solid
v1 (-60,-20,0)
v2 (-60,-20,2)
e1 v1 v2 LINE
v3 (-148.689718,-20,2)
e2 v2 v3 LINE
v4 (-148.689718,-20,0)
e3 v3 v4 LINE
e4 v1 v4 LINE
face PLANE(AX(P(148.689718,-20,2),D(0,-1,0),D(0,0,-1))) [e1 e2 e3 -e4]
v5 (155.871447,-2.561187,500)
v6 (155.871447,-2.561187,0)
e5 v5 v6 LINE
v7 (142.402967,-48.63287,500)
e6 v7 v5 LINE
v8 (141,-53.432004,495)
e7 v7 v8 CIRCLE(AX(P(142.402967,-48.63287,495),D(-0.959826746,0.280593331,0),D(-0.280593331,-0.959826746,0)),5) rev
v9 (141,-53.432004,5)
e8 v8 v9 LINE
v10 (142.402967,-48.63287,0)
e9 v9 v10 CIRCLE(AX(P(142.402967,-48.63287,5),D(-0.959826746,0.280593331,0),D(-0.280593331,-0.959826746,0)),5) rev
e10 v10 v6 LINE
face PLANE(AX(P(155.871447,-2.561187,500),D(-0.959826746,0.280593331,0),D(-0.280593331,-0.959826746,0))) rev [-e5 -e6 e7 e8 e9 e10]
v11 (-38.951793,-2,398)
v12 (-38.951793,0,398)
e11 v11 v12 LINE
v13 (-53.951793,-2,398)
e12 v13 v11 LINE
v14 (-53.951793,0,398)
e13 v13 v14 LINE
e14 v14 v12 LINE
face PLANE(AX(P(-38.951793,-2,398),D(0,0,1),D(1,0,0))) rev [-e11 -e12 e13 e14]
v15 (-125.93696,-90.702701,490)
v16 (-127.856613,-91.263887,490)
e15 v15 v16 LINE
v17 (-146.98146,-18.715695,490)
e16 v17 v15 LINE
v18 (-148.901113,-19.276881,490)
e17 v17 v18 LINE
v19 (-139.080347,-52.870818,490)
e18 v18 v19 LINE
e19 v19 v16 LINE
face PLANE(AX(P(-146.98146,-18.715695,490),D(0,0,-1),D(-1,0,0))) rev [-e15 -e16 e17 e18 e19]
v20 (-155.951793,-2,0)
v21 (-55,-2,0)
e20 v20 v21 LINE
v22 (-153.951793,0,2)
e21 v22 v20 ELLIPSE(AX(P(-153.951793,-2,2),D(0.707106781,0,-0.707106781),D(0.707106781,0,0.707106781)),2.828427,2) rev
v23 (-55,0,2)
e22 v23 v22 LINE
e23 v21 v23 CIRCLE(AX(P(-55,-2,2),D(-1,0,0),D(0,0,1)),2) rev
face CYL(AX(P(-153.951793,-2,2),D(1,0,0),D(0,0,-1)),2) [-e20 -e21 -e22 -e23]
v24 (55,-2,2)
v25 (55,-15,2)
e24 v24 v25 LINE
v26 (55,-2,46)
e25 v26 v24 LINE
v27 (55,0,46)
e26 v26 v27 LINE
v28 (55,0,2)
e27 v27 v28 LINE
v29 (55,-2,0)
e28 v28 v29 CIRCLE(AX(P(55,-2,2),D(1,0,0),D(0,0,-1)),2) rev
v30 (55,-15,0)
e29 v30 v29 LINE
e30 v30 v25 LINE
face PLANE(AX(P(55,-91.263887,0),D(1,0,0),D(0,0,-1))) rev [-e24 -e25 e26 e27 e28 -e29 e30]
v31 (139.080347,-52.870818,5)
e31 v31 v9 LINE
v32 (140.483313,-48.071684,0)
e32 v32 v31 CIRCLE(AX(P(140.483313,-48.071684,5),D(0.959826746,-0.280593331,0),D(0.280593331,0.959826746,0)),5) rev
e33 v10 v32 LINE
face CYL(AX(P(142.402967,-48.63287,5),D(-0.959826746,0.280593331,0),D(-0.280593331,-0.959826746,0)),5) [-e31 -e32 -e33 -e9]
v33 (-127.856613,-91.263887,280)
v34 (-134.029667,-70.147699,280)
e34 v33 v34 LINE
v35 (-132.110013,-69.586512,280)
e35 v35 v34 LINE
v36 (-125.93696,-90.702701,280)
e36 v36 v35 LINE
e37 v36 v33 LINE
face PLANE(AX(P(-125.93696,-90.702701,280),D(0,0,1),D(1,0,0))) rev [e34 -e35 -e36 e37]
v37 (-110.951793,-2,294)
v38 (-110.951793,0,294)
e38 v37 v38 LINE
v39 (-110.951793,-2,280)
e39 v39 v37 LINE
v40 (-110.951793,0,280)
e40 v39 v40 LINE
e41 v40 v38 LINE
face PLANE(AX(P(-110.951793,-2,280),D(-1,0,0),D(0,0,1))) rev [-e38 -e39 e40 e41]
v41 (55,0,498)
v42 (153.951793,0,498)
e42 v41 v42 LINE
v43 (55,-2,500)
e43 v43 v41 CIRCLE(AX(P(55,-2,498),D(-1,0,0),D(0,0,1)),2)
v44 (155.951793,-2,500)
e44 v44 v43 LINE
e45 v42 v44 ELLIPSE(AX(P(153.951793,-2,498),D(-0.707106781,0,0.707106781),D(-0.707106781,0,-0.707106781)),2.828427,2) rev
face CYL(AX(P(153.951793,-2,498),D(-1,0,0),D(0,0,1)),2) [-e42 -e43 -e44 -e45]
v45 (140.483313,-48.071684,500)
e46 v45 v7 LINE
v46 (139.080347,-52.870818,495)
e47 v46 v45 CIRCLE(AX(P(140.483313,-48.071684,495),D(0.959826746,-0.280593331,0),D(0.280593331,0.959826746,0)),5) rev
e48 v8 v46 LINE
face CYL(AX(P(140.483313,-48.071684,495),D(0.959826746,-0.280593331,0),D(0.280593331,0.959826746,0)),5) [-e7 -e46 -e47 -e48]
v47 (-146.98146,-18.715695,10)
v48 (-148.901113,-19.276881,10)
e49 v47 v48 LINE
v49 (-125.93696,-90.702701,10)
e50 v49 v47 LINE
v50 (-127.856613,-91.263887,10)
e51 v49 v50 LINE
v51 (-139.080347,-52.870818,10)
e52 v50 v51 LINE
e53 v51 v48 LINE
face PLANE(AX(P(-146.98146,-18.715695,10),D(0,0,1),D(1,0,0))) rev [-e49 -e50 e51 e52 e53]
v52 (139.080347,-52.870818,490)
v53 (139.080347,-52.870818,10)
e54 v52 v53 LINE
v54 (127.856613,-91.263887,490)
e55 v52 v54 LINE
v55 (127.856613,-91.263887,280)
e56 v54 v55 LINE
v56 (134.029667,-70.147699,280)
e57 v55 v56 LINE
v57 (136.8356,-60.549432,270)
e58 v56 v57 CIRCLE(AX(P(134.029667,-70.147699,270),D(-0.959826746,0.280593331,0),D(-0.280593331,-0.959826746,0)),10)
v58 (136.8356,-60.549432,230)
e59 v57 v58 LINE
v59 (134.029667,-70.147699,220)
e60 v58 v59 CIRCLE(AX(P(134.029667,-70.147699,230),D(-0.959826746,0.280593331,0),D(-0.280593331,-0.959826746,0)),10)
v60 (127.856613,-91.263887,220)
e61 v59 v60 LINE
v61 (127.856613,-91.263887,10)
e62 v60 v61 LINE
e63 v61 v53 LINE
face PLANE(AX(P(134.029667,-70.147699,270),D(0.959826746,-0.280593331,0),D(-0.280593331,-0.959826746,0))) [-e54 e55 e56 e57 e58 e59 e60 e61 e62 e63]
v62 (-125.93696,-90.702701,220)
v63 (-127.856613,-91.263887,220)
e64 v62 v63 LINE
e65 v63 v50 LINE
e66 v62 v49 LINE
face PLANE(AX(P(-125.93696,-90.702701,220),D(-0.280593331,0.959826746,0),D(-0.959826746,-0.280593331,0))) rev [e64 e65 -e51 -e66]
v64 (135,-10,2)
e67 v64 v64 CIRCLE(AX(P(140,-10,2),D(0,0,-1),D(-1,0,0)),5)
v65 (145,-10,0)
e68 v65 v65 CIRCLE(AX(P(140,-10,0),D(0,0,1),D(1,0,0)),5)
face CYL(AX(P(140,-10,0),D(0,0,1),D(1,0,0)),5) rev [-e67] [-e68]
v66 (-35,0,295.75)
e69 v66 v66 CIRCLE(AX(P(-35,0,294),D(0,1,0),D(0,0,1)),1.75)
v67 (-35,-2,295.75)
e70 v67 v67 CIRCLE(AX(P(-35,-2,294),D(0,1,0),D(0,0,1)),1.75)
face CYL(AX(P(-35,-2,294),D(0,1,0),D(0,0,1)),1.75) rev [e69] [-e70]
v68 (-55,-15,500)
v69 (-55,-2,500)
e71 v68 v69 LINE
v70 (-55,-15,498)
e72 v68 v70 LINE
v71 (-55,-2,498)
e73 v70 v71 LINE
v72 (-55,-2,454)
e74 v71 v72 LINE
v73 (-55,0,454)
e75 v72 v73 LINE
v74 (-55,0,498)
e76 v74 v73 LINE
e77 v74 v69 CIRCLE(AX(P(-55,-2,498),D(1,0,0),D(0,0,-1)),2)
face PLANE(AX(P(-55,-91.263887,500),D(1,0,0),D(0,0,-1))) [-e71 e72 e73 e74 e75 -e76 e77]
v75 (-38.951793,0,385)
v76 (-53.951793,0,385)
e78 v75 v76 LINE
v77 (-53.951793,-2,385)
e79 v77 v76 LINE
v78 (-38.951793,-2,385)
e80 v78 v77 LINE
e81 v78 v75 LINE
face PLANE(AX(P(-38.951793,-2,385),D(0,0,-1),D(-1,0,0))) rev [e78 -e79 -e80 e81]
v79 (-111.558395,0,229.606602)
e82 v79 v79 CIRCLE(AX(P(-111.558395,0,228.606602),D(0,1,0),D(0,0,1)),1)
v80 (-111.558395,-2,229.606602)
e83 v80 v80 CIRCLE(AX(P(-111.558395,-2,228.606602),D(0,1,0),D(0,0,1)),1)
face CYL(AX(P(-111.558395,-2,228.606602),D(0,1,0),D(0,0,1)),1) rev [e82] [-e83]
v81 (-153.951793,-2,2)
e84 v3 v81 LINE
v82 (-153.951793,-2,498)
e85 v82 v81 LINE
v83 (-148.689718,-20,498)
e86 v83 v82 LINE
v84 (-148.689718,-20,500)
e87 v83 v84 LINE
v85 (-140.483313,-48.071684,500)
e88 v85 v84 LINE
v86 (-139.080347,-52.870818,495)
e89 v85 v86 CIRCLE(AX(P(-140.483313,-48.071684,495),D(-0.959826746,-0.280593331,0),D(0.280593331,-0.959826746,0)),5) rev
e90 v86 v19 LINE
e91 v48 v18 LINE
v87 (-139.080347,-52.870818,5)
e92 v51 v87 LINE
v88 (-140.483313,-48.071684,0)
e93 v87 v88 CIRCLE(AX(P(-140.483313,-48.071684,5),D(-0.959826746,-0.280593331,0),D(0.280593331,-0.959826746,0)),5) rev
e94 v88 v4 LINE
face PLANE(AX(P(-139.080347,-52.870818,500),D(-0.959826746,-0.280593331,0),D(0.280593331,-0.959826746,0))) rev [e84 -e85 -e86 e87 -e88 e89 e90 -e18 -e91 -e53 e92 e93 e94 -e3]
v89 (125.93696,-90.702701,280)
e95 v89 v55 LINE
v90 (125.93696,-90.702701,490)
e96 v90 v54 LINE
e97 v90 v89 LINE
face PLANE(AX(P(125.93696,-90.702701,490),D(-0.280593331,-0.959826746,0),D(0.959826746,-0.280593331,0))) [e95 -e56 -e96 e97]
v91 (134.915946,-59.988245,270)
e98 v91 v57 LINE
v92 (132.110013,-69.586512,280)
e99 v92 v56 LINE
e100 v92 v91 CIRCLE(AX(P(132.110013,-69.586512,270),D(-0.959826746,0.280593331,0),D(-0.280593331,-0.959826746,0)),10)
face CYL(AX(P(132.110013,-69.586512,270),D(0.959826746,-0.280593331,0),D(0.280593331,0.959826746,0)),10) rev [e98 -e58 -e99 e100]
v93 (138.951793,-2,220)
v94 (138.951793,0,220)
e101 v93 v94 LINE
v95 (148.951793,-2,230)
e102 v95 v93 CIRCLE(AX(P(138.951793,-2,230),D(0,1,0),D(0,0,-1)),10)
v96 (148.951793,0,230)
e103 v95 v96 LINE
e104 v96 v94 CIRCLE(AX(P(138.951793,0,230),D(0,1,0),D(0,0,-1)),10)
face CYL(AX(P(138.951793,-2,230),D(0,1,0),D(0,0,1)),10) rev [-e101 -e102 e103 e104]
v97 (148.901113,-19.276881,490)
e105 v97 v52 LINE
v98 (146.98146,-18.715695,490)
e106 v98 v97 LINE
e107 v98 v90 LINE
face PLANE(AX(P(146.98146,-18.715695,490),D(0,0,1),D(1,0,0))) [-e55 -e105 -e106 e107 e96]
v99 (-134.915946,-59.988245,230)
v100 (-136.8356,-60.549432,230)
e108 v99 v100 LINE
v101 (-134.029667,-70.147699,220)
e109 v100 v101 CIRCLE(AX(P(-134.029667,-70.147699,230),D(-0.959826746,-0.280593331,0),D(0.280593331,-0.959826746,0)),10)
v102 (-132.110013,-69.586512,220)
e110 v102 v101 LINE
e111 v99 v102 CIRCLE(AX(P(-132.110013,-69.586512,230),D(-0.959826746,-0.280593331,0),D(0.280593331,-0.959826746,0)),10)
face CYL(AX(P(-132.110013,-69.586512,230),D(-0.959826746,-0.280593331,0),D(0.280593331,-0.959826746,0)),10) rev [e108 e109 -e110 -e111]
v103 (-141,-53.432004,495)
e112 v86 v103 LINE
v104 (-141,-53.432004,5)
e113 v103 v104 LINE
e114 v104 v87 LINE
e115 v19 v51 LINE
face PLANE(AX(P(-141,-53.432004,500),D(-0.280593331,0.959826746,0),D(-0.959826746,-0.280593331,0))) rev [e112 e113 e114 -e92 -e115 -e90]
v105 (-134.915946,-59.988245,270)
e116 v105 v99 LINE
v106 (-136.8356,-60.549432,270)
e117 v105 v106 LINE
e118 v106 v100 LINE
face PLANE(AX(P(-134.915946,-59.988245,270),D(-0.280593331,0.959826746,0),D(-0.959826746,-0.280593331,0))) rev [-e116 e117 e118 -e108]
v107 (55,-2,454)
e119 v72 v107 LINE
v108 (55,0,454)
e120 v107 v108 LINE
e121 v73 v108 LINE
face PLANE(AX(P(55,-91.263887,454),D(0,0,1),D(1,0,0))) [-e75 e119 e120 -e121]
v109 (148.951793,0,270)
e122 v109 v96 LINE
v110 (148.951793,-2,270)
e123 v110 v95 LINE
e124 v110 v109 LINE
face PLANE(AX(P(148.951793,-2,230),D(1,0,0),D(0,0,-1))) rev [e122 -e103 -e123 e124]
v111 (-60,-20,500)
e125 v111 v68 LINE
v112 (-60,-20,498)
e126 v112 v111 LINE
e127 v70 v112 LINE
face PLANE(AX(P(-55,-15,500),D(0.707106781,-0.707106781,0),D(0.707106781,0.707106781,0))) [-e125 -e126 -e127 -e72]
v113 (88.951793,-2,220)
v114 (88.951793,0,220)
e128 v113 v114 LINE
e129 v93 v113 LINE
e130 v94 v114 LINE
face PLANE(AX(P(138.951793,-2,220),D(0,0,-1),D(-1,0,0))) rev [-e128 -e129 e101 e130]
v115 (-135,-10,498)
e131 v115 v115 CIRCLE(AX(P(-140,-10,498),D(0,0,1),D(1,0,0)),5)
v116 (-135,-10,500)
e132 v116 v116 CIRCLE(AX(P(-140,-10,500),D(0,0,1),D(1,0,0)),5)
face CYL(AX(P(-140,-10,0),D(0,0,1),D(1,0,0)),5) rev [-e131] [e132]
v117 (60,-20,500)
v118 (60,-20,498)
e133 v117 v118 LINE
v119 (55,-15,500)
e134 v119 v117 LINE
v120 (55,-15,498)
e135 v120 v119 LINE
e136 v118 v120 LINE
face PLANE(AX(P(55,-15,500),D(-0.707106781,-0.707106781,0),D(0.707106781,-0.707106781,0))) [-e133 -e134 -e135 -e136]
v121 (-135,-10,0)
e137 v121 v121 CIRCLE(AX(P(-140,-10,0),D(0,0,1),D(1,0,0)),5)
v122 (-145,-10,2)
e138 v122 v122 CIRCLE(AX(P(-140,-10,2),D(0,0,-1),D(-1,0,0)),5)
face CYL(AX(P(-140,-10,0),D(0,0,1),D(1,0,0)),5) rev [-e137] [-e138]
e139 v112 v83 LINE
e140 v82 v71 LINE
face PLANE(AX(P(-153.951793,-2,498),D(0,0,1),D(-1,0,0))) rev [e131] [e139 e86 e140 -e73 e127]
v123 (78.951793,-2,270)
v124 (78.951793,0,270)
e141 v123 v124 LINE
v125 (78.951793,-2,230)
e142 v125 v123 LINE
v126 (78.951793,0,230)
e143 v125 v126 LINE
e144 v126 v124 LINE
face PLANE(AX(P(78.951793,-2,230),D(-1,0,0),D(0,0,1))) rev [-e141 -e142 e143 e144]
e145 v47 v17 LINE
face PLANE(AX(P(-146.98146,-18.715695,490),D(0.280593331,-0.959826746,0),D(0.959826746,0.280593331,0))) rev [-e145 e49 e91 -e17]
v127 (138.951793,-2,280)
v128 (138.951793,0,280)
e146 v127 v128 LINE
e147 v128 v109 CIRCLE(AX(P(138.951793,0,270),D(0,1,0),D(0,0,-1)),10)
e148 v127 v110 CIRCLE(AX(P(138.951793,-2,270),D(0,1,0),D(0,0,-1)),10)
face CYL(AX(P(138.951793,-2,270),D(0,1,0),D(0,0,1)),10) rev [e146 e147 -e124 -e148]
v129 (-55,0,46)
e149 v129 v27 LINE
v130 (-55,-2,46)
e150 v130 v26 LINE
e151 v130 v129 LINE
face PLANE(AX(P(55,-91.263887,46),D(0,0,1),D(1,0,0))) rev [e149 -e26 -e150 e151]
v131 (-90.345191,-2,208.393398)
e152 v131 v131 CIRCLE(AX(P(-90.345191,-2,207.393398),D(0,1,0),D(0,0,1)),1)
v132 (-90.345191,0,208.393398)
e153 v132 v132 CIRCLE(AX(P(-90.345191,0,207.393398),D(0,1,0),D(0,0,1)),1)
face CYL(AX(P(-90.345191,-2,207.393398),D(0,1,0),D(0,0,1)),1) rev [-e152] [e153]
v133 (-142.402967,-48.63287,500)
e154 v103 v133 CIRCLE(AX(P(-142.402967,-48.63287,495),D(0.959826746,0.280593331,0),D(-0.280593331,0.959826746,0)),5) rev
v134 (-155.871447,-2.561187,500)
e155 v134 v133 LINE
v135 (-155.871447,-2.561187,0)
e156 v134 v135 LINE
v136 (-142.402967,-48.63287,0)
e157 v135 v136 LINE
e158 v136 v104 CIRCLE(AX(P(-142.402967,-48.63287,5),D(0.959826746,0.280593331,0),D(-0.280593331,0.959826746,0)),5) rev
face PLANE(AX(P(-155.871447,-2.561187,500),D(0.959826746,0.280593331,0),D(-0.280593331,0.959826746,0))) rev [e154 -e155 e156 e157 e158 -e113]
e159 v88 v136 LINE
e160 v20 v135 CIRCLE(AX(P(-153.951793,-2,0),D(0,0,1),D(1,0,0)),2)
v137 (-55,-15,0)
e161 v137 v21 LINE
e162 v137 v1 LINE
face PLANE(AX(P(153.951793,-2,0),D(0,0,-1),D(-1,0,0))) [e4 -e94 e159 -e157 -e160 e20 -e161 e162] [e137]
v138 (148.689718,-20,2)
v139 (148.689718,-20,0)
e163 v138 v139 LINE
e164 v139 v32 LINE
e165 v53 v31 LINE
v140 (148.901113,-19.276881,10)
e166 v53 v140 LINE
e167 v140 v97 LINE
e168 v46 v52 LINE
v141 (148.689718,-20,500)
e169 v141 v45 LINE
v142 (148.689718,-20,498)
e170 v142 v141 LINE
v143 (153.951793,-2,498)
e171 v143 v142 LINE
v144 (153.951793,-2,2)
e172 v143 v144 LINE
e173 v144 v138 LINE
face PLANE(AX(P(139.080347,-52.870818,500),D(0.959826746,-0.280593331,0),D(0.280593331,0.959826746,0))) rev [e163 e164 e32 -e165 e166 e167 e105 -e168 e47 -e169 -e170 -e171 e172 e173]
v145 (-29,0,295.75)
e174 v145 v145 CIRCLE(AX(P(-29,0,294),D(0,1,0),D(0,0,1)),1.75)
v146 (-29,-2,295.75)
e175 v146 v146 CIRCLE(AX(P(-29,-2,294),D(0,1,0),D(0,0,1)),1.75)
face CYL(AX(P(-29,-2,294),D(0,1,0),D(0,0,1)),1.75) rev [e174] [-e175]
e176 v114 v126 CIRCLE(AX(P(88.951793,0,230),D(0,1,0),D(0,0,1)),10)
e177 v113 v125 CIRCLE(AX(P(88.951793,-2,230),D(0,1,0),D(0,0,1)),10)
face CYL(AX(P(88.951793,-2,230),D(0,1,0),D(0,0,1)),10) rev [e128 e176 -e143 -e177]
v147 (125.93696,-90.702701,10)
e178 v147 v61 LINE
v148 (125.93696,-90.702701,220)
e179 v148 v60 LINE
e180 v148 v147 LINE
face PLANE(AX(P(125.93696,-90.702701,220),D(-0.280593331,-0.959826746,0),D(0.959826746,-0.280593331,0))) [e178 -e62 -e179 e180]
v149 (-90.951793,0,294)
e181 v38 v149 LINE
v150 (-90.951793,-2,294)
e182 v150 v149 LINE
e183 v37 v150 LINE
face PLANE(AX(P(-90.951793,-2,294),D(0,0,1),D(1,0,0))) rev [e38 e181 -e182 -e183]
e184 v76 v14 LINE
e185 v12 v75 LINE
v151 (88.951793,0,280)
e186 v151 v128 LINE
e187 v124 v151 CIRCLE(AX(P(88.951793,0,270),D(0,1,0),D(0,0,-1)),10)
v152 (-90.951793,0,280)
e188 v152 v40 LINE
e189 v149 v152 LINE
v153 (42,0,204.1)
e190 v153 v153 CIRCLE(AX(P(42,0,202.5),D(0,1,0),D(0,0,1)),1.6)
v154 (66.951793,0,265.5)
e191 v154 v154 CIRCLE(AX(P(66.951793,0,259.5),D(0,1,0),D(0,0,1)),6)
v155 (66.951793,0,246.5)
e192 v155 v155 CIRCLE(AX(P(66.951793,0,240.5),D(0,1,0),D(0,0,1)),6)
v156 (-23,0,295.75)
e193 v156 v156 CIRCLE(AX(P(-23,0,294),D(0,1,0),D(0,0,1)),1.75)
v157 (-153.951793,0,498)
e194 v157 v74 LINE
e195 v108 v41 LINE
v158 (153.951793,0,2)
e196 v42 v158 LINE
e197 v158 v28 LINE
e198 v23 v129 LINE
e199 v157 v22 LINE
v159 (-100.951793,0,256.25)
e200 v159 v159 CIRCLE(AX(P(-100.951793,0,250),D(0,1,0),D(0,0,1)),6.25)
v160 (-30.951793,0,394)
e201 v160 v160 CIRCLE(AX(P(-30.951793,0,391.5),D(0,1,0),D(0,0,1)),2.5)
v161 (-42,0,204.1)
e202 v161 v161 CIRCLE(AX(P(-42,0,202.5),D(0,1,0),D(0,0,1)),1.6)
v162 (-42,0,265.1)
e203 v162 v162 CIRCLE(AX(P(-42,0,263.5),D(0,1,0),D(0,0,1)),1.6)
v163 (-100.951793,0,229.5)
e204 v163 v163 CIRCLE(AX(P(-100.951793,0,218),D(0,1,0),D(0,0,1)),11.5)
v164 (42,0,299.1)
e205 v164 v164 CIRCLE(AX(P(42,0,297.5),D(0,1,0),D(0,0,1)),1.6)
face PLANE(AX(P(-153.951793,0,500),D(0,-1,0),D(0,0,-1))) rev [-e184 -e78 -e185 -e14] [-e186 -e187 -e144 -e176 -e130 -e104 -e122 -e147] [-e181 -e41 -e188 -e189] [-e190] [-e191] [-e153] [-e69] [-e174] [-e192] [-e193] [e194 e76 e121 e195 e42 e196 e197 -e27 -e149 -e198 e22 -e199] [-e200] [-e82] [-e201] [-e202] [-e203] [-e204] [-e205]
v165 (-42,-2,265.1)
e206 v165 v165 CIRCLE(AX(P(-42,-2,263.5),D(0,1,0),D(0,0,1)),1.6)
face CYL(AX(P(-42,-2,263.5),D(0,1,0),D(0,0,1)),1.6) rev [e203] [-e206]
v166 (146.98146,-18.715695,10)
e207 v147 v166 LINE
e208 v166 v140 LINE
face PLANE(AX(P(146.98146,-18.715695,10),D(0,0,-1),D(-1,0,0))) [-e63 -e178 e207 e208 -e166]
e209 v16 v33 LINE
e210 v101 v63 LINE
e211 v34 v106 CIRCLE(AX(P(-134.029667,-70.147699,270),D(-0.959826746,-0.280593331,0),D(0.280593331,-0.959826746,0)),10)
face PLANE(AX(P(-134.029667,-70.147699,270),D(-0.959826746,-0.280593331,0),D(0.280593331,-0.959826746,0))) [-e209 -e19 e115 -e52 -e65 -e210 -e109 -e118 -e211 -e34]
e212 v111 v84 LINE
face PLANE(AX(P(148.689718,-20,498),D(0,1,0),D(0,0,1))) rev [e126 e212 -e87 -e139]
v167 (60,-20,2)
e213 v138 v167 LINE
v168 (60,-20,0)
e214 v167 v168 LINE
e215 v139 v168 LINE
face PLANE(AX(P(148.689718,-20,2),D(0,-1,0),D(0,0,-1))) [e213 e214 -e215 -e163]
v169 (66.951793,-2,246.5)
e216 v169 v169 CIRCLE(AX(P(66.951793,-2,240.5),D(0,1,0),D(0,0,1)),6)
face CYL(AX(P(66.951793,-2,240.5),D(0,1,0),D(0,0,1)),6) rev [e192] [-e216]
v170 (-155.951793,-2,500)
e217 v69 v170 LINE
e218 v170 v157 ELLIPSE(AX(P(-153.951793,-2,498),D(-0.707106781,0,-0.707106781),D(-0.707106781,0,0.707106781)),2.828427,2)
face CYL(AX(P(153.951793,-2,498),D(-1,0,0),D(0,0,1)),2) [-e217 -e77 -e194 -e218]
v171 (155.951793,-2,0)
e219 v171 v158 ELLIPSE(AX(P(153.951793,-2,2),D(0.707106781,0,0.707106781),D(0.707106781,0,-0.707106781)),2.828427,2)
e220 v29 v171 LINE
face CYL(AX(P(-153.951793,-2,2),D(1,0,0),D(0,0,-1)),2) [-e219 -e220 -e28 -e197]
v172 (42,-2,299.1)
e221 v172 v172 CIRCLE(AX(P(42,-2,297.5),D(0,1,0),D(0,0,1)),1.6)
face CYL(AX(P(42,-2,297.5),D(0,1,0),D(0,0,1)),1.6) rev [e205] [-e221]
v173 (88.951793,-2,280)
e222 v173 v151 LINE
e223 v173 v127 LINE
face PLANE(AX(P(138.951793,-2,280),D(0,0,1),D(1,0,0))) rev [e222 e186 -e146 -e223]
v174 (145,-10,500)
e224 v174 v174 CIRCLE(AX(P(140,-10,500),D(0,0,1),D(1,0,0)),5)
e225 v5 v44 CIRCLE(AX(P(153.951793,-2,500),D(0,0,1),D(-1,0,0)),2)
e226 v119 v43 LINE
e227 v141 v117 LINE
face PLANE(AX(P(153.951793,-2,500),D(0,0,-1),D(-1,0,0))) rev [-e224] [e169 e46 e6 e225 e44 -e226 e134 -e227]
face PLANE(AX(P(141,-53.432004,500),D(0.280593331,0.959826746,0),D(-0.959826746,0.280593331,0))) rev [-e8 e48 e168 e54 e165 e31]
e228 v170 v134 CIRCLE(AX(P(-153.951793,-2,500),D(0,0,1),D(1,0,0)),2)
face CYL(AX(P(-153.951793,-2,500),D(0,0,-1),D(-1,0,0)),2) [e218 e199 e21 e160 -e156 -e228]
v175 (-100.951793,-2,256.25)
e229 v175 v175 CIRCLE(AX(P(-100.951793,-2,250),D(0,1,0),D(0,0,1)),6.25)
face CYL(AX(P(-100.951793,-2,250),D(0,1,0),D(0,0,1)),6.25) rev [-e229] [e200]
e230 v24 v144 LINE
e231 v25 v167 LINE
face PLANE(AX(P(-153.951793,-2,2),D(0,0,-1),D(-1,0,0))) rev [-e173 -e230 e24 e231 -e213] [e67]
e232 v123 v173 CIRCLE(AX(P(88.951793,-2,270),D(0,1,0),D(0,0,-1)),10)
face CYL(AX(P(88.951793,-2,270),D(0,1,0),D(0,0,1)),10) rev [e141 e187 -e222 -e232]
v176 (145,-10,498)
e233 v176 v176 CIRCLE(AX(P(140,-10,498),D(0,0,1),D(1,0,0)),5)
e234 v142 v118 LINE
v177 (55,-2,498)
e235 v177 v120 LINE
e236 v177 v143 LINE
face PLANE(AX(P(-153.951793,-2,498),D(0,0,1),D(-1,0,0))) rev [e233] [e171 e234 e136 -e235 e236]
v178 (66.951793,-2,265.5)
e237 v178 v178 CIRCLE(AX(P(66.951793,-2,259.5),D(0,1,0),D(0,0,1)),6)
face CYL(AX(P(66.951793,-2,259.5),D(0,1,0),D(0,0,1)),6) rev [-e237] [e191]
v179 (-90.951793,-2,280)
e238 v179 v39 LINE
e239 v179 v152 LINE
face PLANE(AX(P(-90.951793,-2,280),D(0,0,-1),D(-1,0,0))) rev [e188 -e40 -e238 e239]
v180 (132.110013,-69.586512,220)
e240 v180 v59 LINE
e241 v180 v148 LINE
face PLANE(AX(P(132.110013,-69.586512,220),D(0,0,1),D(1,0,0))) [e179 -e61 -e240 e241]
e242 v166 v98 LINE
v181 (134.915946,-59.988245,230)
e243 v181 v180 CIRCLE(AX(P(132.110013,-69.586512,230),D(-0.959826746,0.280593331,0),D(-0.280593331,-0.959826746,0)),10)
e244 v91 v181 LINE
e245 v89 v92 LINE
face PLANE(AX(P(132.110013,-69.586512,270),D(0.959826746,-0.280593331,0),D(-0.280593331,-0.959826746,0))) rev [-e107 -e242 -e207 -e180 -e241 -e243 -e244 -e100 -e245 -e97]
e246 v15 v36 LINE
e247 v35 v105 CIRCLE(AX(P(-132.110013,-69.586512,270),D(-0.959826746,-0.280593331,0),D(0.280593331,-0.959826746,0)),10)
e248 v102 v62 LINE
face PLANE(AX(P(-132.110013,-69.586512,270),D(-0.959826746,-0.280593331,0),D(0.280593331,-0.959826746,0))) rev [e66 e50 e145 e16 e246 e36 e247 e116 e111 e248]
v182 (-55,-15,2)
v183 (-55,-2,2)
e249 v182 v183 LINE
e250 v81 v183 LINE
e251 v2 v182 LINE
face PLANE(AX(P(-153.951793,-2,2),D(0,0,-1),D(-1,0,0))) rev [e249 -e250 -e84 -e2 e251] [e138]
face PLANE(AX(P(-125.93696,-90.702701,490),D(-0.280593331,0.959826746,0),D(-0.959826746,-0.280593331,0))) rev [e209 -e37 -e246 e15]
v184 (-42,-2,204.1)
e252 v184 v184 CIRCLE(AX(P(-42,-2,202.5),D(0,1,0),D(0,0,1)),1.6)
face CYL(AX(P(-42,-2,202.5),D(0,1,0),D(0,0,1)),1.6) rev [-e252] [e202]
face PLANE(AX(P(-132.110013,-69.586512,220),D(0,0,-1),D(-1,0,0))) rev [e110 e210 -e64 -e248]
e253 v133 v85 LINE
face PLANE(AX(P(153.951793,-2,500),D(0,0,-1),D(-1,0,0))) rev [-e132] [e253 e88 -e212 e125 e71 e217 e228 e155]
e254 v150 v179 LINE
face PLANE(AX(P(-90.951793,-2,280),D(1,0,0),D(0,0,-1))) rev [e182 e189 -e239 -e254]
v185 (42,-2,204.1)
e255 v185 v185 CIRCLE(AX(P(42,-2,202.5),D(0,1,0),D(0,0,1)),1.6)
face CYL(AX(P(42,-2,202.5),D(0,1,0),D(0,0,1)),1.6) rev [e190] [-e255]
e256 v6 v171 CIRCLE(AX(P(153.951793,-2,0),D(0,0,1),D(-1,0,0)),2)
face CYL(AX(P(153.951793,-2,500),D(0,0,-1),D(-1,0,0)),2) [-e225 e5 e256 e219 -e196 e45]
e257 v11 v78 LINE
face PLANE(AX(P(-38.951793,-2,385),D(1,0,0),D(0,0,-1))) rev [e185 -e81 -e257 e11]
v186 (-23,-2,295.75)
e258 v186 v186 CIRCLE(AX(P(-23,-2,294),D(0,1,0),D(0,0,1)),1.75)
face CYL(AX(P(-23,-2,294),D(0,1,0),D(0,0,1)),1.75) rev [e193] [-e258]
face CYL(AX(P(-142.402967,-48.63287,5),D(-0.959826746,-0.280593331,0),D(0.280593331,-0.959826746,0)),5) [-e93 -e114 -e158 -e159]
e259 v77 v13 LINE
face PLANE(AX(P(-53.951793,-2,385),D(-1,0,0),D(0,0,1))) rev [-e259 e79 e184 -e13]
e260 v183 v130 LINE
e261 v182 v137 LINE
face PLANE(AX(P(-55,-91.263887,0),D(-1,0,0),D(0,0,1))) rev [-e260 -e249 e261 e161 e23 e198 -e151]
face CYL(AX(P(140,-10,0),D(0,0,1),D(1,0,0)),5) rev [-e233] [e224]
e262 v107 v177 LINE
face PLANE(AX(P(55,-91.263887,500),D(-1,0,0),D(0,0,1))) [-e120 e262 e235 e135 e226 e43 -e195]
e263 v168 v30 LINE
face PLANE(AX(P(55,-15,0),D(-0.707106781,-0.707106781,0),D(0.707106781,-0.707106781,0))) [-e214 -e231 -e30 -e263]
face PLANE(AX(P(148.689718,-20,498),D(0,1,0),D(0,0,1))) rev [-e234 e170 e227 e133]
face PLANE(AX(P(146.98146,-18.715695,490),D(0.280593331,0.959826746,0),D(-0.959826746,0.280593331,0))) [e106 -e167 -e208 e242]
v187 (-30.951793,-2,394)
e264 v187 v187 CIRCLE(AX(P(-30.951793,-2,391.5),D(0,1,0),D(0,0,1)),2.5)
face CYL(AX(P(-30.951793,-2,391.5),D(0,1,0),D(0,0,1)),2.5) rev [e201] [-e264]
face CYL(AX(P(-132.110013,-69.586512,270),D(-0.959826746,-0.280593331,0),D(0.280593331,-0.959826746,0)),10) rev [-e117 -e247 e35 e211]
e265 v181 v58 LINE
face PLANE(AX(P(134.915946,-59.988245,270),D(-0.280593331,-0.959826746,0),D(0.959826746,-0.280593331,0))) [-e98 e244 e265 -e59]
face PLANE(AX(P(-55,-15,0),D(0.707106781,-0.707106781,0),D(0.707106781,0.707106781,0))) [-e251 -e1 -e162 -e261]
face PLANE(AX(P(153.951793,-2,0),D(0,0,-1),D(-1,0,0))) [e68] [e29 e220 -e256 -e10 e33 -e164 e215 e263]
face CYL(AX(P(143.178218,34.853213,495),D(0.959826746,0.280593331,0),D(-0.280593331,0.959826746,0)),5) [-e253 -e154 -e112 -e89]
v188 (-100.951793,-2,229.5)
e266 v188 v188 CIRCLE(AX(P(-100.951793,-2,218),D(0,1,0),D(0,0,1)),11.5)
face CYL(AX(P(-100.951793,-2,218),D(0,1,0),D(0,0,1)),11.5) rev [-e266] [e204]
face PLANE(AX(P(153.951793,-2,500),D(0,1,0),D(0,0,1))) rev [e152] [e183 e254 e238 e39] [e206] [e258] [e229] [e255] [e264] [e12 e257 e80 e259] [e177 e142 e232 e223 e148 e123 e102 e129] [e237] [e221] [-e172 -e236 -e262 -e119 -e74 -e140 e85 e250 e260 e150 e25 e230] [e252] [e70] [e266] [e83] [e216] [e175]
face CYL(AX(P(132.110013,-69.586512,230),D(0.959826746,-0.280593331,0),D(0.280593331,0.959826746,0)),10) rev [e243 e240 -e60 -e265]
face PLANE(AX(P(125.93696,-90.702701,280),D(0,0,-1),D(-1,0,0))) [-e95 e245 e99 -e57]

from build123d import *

# Parameters (mm, degrees)
EXTRUSION1_DEPTH             = 500
CONG_1_R                     = 5
EXTRUSION2_DEPTH             = 2
ENL_V_MAT_EXTRU_1_DEPTH      = 2
EXTRUSION3_DEPTH             = 2
ESQUISSE6_W                  = 110
ESQUISSE6_H                  = 46
ENL_V_MAT_EXTRU_7_DEPTH      = 532.648435432
CHANFREIN1_SIZE              = 5
CHANFREIN1_OF_SYM_TRIE4_SIZE = 5
CONG_4_START                 = -157
CONG_4_DEPTH                 = 314
ESQUISSE7_R                  = 5
ENL_V_MAT_EXTRU_8_DEPTH      = 532.648435555
ESQUISSE8_R                  = 6.25
ESQUISSE8_R_2                = 11.5
ESQUISSE8_R_3                = 1
ESQUISSE8_R_4                = 6
ESQUISSE8_R_5                = 2.5
ESQUISSE8_W                  = 20
ESQUISSE8_H                  = 14
ESQUISSE8_W_2                = 15
ESQUISSE8_H_2                = 13
ENL_V_MAT_EXTRU_9_DEPTH      = 2
ESQUISSE9_R                  = 1.6
ESQUISSE9_R_2                = 1.75
ENL_V_MAT_EXTRU_10_DEPTH     = 2


with BuildPart() as part:
    # Esquisse1 → Extrusion1 (new body)
    with BuildSketch(Plane.XY):
        with BuildLine():
            Line((-153.951793051, 0), (153.951793051, 0))
            ThreePointArc((153.951793051, 0), (155.552163839, -0.800494544), (155.871446543, -2.561186662))
            Line((155.871446543, -2.561186662), (141, -53.432004207))
            Line((141, -53.432004207), (139.080346508, -52.870817545))
            Line((139.080346508, -52.870817545), (153.951793051, -2))
            Line((153.951793051, -2), (-153.951793051, -2))
            Line((-153.951793051, -2), (-139.080346508, -52.870817545))
            Line((-139.080346508, -52.870817545), (-141, -53.432004207))
            Line((-141, -53.432004207), (-155.871446543, -2.561186662))
            ThreePointArc((-155.871446543, -2.561186662), (-155.552163839, -0.800494544), (-153.951793051, 0))
        make_face()
    extrude(amount=EXTRUSION1_DEPTH)

    # Congé1
    cong_1_edges = [part.edges().sort_by_distance(p)[0] for p in [
        (-140.040173254, -53.151410876, 0),
        (-140.040173254, -53.151410876, 500),
        (140.040173254, -53.151410876, 500),
        (140.040173254, -53.151410876, 0),
    ]]
    fillet(cong_1_edges, radius=CONG_1_R)

    # Esquisse2 → Extrusion2 (add)
    with BuildSketch(Plane(origin=(-142.369407398, -41.619913609, 0), x_dir=(0, 0, -1), z_dir=(0.9598267461373389, 0.2805933309959605, 0))):
        with BuildLine():
            Line((-490, 23.278192933), (-10, 23.278192933))
            Line((-10, 23.278192933), (-10, -51.721807067))
            Line((-10, -51.721807067), (-220, -51.721807067))
            Line((-220, -51.721807067), (-220, -29.721807067))
            ThreePointArc((-220, -29.721807067), (-222.928932188, -22.650739256), (-230, -19.721807067))
            Line((-230, -19.721807067), (-270, -19.721807067))
            ThreePointArc((-270, -19.721807067), (-277.071067812, -22.650739256), (-280, -29.721807067))
            Line((-280, -29.721807067), (-280, -51.721807067))
            Line((-280, -51.721807067), (-490, -51.721807067))
            Line((-490, -51.721807067), (-490, 23.278192933))
        make_face()
    extrusion2 = extrude(amount=EXTRUSION2_DEPTH)

    # Symétrie1: Extrusion2 across plane
    add(extrusion2.mirror(Plane(origin=(0, 0, 0), x_dir=(0, 0, 1), z_dir=(1, 0, 0))))

    # Esquisse3 → Enlèv. mat.-Extru.1 (cut)
    with BuildSketch(Plane(origin=(0, 0, 0), x_dir=(-1, 0, 0), z_dir=(0, 1, 0))):
        with BuildLine():
            Line((-138.951793051, 220), (-88.951793051, 220))
            ThreePointArc((-88.951793051, 220), (-81.880725239, 222.928932188), (-78.951793051, 230))
            Line((-78.951793051, 230), (-78.951793051, 270))
            ThreePointArc((-78.951793051, 270), (-81.880725239, 277.071067812), (-88.951793051, 280))
            Line((-88.951793051, 280), (-138.951793051, 280))
            ThreePointArc((-138.951793051, 280), (-146.022860862, 277.071067812), (-148.951793051, 270))
            Line((-148.951793051, 270), (-148.951793051, 230))
            ThreePointArc((-148.951793051, 230), (-146.022860862, 222.928932188), (-138.951793051, 220))
        make_face()
    extrude(amount=-ENL_V_MAT_EXTRU_1_DEPTH, mode=Mode.SUBTRACT)

    # Esquisse4 → Extrusion3 (add)
    with BuildSketch(Plane(origin=(0, 0, 0), x_dir=(-1, 0, 0), z_dir=(0, 0, -1))):
        Polygon((153.951793051, -2), (-153.951793051, -2), (-148.689718433, -20), (148.689718433, -20), align=None)
    extrusion3 = extrude(amount=-EXTRUSION3_DEPTH)

    # Esquisse6 → Enlèv. mat.-Extru.7 (cut, through all)
    with BuildSketch(Plane(origin=(0, 0, 0), x_dir=(-1, 0, 0), z_dir=(0, 1, 0))):
        with Locations((0, 23)):
            Rectangle(ESQUISSE6_W, ESQUISSE6_H)
    enl_v_mat_extru_7 = extrude(amount=-ENL_V_MAT_EXTRU_7_DEPTH, mode=Mode.SUBTRACT)

    # Chanfrein1
    chanfrein1_edges = [part.edges().sort_by_distance(p)[0] for p in [
        (55, -20, 1),
        (-55, -20, 1),
    ]]
    chamfer(chanfrein1_edges, length=CHANFREIN1_SIZE)

    # Symétrie4: Extrusion3, Enlèv. mat.-Extru.7 across plane
    add(extrusion3.mirror(Plane.XY.offset(250)))
    add(enl_v_mat_extru_7.mirror(Plane.XY.offset(250)), mode=Mode.SUBTRACT)

    # Chanfrein1 of Symétrie4
    chanfrein1_of_sym_trie4_edges = [part.edges().sort_by_distance(p)[0] for p in [
        (55, -20, 499),
        (-55, -20, 499),
    ]]
    chamfer(chanfrein1_of_sym_trie4_edges, length=CHANFREIN1_OF_SYM_TRIE4_SIZE)

    # Congé4: read off the stored shape, not the designer's step
    # Congé4 outline → Congé4 (cut)
    with BuildSketch(Plane.YZ.offset(CONG_4_START)):
        with BuildLine():
            Line((0, 500), (-2, 500))
            ThreePointArc((-2, 500), (-0.585786438, 499.414213562), (0, 498))
            Line((0, 498), (0, 500))
        make_face()
        with BuildLine():
            Line((0, 0), (0, 2))
            ThreePointArc((0, 2), (-0.585786438, 0.585786438), (-2, 0))
            Line((-2, 0), (0, 0))
        make_face()
    extrude(amount=CONG_4_DEPTH, mode=Mode.SUBTRACT)

    # Esquisse7 → Enlèv. mat.-Extru.8 (cut, through all)
    with BuildSketch(Plane.XY.offset(500)):
        with Locations((-140, -10)):
            Circle(ESQUISSE7_R)
        with Locations((140, -10)):
            Circle(ESQUISSE7_R)
    extrude(amount=-ENL_V_MAT_EXTRU_8_DEPTH, mode=Mode.SUBTRACT)

    # Esquisse8 → Enlèv. mat.-Extru.9 (cut)
    with BuildSketch(Plane(origin=(0, 0, 0), x_dir=(-1, 0, 0), z_dir=(0, 1, 0))):
        with Locations(Location((100.951793051, 250, 0), (0, 0, 90))):
            Circle(ESQUISSE8_R)
        with Locations(Location((100.951793051, 218, 0), (0, 0, 90))):
            Circle(ESQUISSE8_R_2)
        with Locations(Location((111.558394768, 228.606601718, 0), (0, 0, 90))):
            Circle(ESQUISSE8_R_3)
        with Locations(Location((90.345191333, 207.393398282, 0), (0, 0, 90))):
            Circle(ESQUISSE8_R_3)
        with Locations(Location((-66.951793051, 240.5, 0), (0, 0, 90))):
            Circle(ESQUISSE8_R_4)
        with Locations(Location((-66.951793051, 259.5, 0), (0, 0, 90))):
            Circle(ESQUISSE8_R_4)
        with Locations(Location((30.951793051, 391.5, 0), (0, 0, 90))):
            Circle(ESQUISSE8_R_5)
        with Locations((100.951793051, 287)):
            Rectangle(ESQUISSE8_W, ESQUISSE8_H)
        with Locations((46.451793051, 391.5)):
            Rectangle(ESQUISSE8_W_2, ESQUISSE8_H_2)
    extrude(amount=-ENL_V_MAT_EXTRU_9_DEPTH, mode=Mode.SUBTRACT)

    # Esquisse9 → Enlèv. mat.-Extru.10 (cut)
    with BuildSketch(Plane(origin=(0, 0, 0), x_dir=(-1, 0, 0), z_dir=(0, 1, 0))):
        with Locations(Location((-42, 202.5, 0), (0, 0, 90))):
            Circle(ESQUISSE9_R)
        with Locations(Location((-42, 297.5, 0), (0, 0, 90))):
            Circle(ESQUISSE9_R)
        with Locations(Location((42, 202.5, 0), (0, 0, 90))):
            Circle(ESQUISSE9_R)
        with Locations(Location((42, 263.5, 0), (0, 0, 90))):
            Circle(ESQUISSE9_R)
        with Locations(Location((23, 294, 0), (0, 0, 90))):
            Circle(ESQUISSE9_R_2)
        with Locations(Location((29, 294, 0), (0, 0, 90))):
            Circle(ESQUISSE9_R_2)
        with Locations(Location((35, 294, 0), (0, 0, 90))):
            Circle(ESQUISSE9_R_2)
    extrude(amount=-ENL_V_MAT_EXTRU_10_DEPTH, mode=Mode.SUBTRACT)


solid = part.part
